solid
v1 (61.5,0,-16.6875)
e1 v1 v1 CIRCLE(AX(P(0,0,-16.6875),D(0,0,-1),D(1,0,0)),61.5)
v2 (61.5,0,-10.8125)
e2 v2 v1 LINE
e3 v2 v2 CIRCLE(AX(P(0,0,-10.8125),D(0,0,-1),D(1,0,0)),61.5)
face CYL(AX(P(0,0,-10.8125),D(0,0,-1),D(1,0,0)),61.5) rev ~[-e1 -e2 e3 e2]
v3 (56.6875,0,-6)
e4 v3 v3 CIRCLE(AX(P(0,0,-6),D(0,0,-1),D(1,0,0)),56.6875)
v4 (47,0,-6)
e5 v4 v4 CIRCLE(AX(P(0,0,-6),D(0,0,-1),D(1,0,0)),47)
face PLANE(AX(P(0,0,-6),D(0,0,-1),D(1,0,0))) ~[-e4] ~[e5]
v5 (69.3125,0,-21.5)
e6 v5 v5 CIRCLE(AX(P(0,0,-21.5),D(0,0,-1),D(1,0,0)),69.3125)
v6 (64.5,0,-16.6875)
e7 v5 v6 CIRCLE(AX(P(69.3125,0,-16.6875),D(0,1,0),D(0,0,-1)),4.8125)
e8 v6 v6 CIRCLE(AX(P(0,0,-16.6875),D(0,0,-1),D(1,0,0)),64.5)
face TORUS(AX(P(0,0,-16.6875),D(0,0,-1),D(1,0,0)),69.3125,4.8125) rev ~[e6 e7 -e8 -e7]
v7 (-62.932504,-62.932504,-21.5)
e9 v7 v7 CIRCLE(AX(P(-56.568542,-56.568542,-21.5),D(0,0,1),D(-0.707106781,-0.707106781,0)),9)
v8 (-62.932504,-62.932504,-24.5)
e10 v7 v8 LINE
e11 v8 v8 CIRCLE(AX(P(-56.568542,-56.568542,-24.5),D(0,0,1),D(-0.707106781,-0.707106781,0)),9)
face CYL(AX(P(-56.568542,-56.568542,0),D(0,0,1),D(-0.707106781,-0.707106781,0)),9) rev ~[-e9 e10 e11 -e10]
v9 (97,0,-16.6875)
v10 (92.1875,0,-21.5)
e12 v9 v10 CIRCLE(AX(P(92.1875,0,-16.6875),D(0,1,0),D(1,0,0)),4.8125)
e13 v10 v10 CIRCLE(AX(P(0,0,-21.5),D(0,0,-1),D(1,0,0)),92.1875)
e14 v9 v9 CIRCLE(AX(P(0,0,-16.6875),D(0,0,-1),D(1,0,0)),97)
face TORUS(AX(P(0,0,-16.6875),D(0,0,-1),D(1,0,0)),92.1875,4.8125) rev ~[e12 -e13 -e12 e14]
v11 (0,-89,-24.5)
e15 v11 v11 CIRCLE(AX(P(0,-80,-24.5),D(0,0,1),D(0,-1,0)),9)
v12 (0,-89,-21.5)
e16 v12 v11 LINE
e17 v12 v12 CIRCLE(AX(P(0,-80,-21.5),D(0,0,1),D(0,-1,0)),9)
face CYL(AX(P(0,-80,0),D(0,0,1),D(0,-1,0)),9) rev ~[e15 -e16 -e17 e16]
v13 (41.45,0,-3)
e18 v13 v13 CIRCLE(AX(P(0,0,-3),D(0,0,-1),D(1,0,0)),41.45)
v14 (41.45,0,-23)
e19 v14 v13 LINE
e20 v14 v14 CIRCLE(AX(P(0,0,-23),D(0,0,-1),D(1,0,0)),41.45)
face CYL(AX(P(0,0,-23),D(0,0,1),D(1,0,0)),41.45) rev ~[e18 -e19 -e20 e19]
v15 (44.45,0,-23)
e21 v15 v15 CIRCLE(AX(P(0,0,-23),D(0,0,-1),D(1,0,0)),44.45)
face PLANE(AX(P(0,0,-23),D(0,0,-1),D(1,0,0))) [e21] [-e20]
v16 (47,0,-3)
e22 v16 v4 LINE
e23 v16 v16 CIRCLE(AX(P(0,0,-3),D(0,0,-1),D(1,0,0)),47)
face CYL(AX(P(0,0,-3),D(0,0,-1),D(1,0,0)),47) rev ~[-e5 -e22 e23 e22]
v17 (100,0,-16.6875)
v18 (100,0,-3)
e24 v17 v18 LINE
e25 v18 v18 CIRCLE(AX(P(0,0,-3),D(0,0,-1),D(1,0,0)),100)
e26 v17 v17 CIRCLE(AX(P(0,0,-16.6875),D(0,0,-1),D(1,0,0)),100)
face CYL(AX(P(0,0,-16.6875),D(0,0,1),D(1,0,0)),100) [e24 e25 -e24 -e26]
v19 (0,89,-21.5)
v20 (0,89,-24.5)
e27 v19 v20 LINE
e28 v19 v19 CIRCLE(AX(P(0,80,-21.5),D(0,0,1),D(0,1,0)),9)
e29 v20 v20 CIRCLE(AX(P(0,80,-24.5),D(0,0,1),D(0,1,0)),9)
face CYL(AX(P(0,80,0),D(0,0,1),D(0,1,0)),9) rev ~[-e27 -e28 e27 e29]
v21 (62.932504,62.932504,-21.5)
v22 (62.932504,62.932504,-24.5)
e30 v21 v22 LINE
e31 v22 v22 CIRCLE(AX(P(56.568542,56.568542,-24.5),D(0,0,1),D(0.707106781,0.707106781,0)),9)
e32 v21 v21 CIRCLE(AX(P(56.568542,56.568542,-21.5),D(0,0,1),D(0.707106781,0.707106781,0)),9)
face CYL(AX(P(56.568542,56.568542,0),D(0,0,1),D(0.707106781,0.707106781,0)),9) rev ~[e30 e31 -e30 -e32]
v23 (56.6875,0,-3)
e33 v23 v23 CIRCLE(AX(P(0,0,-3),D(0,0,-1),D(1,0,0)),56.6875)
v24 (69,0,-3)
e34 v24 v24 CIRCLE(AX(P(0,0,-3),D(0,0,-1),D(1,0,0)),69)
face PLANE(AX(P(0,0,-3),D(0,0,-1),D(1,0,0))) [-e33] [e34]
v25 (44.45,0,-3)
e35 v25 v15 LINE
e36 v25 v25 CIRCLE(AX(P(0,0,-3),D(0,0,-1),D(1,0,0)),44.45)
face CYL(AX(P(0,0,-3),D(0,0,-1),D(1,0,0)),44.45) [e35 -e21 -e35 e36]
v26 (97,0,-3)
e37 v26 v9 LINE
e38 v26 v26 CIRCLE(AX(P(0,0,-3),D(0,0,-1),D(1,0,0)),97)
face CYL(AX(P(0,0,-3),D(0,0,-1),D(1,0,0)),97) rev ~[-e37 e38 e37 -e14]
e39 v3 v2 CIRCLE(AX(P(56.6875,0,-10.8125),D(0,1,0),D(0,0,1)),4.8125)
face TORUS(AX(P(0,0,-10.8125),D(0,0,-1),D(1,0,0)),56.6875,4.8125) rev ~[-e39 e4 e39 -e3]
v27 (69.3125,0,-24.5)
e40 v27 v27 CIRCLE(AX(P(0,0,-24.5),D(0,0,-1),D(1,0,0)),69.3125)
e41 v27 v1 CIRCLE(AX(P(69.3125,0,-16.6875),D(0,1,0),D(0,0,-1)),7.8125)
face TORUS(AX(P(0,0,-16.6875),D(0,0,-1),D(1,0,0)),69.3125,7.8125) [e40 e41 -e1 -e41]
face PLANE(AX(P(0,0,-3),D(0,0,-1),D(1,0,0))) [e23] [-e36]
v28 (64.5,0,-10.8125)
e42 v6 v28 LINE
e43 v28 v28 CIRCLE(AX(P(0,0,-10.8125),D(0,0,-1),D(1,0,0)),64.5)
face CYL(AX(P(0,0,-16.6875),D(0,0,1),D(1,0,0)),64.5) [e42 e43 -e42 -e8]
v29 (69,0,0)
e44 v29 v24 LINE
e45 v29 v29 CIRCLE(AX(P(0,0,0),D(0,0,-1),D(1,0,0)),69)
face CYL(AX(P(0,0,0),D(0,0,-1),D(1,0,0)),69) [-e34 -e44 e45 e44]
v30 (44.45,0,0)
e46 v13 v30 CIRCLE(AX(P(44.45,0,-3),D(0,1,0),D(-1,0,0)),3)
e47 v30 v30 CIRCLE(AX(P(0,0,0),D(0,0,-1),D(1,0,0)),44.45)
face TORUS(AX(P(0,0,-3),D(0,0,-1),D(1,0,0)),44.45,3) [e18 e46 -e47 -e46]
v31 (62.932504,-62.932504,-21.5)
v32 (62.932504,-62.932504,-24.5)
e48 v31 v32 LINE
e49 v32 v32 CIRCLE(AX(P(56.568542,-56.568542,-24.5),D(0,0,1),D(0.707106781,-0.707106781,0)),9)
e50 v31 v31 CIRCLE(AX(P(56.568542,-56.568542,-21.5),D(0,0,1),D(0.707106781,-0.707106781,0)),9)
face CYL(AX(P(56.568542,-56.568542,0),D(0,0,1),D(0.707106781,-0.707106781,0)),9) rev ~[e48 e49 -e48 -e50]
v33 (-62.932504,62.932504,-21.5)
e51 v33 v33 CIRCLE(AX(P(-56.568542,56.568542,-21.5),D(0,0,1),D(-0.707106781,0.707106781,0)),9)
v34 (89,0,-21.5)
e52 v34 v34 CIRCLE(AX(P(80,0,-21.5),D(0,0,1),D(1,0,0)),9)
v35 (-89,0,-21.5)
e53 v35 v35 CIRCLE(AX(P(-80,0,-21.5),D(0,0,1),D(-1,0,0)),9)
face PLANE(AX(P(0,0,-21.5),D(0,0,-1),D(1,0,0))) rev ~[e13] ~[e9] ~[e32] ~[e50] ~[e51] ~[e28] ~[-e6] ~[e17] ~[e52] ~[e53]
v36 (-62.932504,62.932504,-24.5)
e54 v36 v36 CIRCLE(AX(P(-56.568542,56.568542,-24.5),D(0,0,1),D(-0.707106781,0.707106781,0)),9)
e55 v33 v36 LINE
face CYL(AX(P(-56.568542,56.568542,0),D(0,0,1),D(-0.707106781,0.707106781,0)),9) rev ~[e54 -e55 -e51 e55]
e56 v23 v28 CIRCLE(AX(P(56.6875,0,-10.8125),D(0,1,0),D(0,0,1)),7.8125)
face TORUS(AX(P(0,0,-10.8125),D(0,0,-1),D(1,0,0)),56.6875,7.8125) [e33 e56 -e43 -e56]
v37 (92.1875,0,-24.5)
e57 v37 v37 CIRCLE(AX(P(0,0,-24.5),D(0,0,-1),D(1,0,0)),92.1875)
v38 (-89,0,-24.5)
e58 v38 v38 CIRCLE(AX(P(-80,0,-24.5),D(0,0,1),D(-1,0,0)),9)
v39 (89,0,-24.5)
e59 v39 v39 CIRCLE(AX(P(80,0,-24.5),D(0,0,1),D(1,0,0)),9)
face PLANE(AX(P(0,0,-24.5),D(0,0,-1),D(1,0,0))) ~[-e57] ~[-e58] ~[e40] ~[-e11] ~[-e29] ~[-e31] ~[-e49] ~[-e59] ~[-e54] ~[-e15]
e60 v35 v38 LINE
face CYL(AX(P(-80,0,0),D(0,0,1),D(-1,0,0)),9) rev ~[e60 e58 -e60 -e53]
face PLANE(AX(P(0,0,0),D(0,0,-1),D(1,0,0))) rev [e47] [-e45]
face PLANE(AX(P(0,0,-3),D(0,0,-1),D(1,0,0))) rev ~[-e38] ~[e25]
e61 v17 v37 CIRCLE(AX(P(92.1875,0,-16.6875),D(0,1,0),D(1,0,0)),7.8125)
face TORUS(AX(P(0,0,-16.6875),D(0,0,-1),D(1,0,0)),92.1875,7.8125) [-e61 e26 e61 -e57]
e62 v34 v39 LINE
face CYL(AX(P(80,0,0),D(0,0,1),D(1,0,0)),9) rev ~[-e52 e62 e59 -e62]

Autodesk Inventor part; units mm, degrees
ref_plane "YZ Plane" through (0, 0, 0) normal (1, 0, 0) x (0, 1, 0)
ref_plane "XZ Plane" through (0, 0, 0) normal (0, 1, 0) x (-1, 0, 0)
ref_plane "XY Plane" through (0, 0, 0) normal (0, 0, 1) x (1, 0, 0)
sketch "Sketch1" plane through (0, 0, 0) normal (0, 1, 0) x (-1, 0, 0)
  line L0 (0, 0) -> (0, -38.85397)
  line L1 (-69, 0) -> (-44.45, 0)
  arc A0 (-41.45, -3) -> (-44.45, 0) centre (-44.45, -3) ccw
  line L2 (-41.45, -3) -> (-41.45, -23)
  line L3 (-41.45, -23) -> (-44.45, -23)
  line L4 (-44.45, -23) -> (-44.45, -3)
  arc A1 (-44.45, -3) -> (-44.45, -3) centre (-44.45, -3) ccw
  line L5 (-44.45, -3) -> (-69, -3)
  line L6 (-69, -3) -> (-69, 0)
  point P0 (-56.725, 0)
  dimension "H_cllr" = 23
  dimension "D_ext_tube" = 88.9
  dimension "D_ext_clllr" = 138
  dimension "d26" = 3
sketch "Sketch1 outline for Revolution1" plane through (0, 0, 0) normal (0, 1, 0) x (-1, 0, 0)
  arc A0 (-41.45, -3) -> (-44.45, 0) centre (-44.45, -3) ccw
  line L0 (-41.45, -23) -> (-41.45, -3)
  line L1 (-44.45, -23) -> (-41.45, -23)
  line L2 (-44.45, -3) -> (-44.45, -23)
  line L3 (-69, -3) -> (-44.45, -3)
  line L4 (-69, 0) -> (-69, -3)
  line L5 (-44.45, 0) -> (-69, 0)
revolve "Revolution1" add sketch "Sketch1 outline for Revolution1" angle 360 about axis through (0, 0, 0) along (0, 0, -1)
sketch "Sketch2" plane through (0, 0, 0) normal (0, 1, 0) x (-1, 0, 0)
  line L0 (0, 0) -> (0, -50.951284)
  line L1 (-47, -6) -> (-56.6875, -6)
  arc A0 (-56.6875, -6) -> (-61.5, -10.8125) centre (-56.6875, -10.8125) ccw
  line L2 (-61.5, -10.8125) -> (-61.5, -16.6875)
  arc A1 (-69.3125, -24.5) -> (-61.5, -16.6875) centre (-69.3125, -16.6875) ccw
  line L3 (-69.3125, -24.5) -> (-92.1875, -24.5)
  arc A2 (-100, -16.6875) -> (-92.1875, -24.5) centre (-92.1875, -16.6875) ccw
  line L4 (-100, -16.6875) -> (-100, -3)
  line L5 (-100, -3) -> (-97, -3)
  line L6 (-97, -3) -> (-97, -16.6875)
  arc A3 (-97, -16.6875) -> (-92.1875, -21.5) centre (-92.1875, -16.6875) ccw
  line L7 (-92.1875, -21.5) -> (-69.3125, -21.5)
  arc A4 (-69.3125, -21.5) -> (-64.5, -16.6875) centre (-69.3125, -16.6875) ccw
  line L8 (-64.5, -16.6875) -> (-64.5, -10.8125)
  arc A5 (-56.6875, -3) -> (-64.5, -10.8125) centre (-56.6875, -10.8125) ccw
  line L9 (-56.6875, -3) -> (-47, -3)
  line L10 (-47, -3) -> (-47, -6)
  point P0 (-98.5, -3)
  point P1 (-51.84375, -3)
  dimension "d8" = 3
  dimension "Thknss_lpd" = 3
  dimension "d10" = 4.8125
  dimension "H_lpd" = 21.5
  dimension "D_ext_lpd" = 200
  dimension "d_inn_lpd" = 94
  dimension "d2_inn_lpd" = 123
  dimension "d23" = 38.5
revolve "Revolution2" add sketch "Sketch2" angle 360 about axis through (0, 0, 0) along (0, 0, -1)
sketch "Sketch3" plane through (0, 0, 0) normal (0, 0, 1) x (1, 0, 0)
  circle A0 centre (80, 0) radius 9
  line L0 (0, 0) -> (0, 123.830608)
  dimension "hl_d" = 18
  dimension "D_hl_c" = 160
extrude "Extrusion1" cut sketch "Sketch3" against normal through all
pattern_circular "Circular Pattern1" count 8 over 360 about axis through (0, 0, -10) along (0, 0, 1) of "Extrusion1"
equation "\"d26\" = Thknss_lpd"
equation "\"d8\" = Thknss_cllr"
equation "\"d10\" = 0.125 * d23"
equation "\"Thknss_cllr\" = 3"
properties part number "Stamp flange DIN2642-80" material "Stainless Steel"
